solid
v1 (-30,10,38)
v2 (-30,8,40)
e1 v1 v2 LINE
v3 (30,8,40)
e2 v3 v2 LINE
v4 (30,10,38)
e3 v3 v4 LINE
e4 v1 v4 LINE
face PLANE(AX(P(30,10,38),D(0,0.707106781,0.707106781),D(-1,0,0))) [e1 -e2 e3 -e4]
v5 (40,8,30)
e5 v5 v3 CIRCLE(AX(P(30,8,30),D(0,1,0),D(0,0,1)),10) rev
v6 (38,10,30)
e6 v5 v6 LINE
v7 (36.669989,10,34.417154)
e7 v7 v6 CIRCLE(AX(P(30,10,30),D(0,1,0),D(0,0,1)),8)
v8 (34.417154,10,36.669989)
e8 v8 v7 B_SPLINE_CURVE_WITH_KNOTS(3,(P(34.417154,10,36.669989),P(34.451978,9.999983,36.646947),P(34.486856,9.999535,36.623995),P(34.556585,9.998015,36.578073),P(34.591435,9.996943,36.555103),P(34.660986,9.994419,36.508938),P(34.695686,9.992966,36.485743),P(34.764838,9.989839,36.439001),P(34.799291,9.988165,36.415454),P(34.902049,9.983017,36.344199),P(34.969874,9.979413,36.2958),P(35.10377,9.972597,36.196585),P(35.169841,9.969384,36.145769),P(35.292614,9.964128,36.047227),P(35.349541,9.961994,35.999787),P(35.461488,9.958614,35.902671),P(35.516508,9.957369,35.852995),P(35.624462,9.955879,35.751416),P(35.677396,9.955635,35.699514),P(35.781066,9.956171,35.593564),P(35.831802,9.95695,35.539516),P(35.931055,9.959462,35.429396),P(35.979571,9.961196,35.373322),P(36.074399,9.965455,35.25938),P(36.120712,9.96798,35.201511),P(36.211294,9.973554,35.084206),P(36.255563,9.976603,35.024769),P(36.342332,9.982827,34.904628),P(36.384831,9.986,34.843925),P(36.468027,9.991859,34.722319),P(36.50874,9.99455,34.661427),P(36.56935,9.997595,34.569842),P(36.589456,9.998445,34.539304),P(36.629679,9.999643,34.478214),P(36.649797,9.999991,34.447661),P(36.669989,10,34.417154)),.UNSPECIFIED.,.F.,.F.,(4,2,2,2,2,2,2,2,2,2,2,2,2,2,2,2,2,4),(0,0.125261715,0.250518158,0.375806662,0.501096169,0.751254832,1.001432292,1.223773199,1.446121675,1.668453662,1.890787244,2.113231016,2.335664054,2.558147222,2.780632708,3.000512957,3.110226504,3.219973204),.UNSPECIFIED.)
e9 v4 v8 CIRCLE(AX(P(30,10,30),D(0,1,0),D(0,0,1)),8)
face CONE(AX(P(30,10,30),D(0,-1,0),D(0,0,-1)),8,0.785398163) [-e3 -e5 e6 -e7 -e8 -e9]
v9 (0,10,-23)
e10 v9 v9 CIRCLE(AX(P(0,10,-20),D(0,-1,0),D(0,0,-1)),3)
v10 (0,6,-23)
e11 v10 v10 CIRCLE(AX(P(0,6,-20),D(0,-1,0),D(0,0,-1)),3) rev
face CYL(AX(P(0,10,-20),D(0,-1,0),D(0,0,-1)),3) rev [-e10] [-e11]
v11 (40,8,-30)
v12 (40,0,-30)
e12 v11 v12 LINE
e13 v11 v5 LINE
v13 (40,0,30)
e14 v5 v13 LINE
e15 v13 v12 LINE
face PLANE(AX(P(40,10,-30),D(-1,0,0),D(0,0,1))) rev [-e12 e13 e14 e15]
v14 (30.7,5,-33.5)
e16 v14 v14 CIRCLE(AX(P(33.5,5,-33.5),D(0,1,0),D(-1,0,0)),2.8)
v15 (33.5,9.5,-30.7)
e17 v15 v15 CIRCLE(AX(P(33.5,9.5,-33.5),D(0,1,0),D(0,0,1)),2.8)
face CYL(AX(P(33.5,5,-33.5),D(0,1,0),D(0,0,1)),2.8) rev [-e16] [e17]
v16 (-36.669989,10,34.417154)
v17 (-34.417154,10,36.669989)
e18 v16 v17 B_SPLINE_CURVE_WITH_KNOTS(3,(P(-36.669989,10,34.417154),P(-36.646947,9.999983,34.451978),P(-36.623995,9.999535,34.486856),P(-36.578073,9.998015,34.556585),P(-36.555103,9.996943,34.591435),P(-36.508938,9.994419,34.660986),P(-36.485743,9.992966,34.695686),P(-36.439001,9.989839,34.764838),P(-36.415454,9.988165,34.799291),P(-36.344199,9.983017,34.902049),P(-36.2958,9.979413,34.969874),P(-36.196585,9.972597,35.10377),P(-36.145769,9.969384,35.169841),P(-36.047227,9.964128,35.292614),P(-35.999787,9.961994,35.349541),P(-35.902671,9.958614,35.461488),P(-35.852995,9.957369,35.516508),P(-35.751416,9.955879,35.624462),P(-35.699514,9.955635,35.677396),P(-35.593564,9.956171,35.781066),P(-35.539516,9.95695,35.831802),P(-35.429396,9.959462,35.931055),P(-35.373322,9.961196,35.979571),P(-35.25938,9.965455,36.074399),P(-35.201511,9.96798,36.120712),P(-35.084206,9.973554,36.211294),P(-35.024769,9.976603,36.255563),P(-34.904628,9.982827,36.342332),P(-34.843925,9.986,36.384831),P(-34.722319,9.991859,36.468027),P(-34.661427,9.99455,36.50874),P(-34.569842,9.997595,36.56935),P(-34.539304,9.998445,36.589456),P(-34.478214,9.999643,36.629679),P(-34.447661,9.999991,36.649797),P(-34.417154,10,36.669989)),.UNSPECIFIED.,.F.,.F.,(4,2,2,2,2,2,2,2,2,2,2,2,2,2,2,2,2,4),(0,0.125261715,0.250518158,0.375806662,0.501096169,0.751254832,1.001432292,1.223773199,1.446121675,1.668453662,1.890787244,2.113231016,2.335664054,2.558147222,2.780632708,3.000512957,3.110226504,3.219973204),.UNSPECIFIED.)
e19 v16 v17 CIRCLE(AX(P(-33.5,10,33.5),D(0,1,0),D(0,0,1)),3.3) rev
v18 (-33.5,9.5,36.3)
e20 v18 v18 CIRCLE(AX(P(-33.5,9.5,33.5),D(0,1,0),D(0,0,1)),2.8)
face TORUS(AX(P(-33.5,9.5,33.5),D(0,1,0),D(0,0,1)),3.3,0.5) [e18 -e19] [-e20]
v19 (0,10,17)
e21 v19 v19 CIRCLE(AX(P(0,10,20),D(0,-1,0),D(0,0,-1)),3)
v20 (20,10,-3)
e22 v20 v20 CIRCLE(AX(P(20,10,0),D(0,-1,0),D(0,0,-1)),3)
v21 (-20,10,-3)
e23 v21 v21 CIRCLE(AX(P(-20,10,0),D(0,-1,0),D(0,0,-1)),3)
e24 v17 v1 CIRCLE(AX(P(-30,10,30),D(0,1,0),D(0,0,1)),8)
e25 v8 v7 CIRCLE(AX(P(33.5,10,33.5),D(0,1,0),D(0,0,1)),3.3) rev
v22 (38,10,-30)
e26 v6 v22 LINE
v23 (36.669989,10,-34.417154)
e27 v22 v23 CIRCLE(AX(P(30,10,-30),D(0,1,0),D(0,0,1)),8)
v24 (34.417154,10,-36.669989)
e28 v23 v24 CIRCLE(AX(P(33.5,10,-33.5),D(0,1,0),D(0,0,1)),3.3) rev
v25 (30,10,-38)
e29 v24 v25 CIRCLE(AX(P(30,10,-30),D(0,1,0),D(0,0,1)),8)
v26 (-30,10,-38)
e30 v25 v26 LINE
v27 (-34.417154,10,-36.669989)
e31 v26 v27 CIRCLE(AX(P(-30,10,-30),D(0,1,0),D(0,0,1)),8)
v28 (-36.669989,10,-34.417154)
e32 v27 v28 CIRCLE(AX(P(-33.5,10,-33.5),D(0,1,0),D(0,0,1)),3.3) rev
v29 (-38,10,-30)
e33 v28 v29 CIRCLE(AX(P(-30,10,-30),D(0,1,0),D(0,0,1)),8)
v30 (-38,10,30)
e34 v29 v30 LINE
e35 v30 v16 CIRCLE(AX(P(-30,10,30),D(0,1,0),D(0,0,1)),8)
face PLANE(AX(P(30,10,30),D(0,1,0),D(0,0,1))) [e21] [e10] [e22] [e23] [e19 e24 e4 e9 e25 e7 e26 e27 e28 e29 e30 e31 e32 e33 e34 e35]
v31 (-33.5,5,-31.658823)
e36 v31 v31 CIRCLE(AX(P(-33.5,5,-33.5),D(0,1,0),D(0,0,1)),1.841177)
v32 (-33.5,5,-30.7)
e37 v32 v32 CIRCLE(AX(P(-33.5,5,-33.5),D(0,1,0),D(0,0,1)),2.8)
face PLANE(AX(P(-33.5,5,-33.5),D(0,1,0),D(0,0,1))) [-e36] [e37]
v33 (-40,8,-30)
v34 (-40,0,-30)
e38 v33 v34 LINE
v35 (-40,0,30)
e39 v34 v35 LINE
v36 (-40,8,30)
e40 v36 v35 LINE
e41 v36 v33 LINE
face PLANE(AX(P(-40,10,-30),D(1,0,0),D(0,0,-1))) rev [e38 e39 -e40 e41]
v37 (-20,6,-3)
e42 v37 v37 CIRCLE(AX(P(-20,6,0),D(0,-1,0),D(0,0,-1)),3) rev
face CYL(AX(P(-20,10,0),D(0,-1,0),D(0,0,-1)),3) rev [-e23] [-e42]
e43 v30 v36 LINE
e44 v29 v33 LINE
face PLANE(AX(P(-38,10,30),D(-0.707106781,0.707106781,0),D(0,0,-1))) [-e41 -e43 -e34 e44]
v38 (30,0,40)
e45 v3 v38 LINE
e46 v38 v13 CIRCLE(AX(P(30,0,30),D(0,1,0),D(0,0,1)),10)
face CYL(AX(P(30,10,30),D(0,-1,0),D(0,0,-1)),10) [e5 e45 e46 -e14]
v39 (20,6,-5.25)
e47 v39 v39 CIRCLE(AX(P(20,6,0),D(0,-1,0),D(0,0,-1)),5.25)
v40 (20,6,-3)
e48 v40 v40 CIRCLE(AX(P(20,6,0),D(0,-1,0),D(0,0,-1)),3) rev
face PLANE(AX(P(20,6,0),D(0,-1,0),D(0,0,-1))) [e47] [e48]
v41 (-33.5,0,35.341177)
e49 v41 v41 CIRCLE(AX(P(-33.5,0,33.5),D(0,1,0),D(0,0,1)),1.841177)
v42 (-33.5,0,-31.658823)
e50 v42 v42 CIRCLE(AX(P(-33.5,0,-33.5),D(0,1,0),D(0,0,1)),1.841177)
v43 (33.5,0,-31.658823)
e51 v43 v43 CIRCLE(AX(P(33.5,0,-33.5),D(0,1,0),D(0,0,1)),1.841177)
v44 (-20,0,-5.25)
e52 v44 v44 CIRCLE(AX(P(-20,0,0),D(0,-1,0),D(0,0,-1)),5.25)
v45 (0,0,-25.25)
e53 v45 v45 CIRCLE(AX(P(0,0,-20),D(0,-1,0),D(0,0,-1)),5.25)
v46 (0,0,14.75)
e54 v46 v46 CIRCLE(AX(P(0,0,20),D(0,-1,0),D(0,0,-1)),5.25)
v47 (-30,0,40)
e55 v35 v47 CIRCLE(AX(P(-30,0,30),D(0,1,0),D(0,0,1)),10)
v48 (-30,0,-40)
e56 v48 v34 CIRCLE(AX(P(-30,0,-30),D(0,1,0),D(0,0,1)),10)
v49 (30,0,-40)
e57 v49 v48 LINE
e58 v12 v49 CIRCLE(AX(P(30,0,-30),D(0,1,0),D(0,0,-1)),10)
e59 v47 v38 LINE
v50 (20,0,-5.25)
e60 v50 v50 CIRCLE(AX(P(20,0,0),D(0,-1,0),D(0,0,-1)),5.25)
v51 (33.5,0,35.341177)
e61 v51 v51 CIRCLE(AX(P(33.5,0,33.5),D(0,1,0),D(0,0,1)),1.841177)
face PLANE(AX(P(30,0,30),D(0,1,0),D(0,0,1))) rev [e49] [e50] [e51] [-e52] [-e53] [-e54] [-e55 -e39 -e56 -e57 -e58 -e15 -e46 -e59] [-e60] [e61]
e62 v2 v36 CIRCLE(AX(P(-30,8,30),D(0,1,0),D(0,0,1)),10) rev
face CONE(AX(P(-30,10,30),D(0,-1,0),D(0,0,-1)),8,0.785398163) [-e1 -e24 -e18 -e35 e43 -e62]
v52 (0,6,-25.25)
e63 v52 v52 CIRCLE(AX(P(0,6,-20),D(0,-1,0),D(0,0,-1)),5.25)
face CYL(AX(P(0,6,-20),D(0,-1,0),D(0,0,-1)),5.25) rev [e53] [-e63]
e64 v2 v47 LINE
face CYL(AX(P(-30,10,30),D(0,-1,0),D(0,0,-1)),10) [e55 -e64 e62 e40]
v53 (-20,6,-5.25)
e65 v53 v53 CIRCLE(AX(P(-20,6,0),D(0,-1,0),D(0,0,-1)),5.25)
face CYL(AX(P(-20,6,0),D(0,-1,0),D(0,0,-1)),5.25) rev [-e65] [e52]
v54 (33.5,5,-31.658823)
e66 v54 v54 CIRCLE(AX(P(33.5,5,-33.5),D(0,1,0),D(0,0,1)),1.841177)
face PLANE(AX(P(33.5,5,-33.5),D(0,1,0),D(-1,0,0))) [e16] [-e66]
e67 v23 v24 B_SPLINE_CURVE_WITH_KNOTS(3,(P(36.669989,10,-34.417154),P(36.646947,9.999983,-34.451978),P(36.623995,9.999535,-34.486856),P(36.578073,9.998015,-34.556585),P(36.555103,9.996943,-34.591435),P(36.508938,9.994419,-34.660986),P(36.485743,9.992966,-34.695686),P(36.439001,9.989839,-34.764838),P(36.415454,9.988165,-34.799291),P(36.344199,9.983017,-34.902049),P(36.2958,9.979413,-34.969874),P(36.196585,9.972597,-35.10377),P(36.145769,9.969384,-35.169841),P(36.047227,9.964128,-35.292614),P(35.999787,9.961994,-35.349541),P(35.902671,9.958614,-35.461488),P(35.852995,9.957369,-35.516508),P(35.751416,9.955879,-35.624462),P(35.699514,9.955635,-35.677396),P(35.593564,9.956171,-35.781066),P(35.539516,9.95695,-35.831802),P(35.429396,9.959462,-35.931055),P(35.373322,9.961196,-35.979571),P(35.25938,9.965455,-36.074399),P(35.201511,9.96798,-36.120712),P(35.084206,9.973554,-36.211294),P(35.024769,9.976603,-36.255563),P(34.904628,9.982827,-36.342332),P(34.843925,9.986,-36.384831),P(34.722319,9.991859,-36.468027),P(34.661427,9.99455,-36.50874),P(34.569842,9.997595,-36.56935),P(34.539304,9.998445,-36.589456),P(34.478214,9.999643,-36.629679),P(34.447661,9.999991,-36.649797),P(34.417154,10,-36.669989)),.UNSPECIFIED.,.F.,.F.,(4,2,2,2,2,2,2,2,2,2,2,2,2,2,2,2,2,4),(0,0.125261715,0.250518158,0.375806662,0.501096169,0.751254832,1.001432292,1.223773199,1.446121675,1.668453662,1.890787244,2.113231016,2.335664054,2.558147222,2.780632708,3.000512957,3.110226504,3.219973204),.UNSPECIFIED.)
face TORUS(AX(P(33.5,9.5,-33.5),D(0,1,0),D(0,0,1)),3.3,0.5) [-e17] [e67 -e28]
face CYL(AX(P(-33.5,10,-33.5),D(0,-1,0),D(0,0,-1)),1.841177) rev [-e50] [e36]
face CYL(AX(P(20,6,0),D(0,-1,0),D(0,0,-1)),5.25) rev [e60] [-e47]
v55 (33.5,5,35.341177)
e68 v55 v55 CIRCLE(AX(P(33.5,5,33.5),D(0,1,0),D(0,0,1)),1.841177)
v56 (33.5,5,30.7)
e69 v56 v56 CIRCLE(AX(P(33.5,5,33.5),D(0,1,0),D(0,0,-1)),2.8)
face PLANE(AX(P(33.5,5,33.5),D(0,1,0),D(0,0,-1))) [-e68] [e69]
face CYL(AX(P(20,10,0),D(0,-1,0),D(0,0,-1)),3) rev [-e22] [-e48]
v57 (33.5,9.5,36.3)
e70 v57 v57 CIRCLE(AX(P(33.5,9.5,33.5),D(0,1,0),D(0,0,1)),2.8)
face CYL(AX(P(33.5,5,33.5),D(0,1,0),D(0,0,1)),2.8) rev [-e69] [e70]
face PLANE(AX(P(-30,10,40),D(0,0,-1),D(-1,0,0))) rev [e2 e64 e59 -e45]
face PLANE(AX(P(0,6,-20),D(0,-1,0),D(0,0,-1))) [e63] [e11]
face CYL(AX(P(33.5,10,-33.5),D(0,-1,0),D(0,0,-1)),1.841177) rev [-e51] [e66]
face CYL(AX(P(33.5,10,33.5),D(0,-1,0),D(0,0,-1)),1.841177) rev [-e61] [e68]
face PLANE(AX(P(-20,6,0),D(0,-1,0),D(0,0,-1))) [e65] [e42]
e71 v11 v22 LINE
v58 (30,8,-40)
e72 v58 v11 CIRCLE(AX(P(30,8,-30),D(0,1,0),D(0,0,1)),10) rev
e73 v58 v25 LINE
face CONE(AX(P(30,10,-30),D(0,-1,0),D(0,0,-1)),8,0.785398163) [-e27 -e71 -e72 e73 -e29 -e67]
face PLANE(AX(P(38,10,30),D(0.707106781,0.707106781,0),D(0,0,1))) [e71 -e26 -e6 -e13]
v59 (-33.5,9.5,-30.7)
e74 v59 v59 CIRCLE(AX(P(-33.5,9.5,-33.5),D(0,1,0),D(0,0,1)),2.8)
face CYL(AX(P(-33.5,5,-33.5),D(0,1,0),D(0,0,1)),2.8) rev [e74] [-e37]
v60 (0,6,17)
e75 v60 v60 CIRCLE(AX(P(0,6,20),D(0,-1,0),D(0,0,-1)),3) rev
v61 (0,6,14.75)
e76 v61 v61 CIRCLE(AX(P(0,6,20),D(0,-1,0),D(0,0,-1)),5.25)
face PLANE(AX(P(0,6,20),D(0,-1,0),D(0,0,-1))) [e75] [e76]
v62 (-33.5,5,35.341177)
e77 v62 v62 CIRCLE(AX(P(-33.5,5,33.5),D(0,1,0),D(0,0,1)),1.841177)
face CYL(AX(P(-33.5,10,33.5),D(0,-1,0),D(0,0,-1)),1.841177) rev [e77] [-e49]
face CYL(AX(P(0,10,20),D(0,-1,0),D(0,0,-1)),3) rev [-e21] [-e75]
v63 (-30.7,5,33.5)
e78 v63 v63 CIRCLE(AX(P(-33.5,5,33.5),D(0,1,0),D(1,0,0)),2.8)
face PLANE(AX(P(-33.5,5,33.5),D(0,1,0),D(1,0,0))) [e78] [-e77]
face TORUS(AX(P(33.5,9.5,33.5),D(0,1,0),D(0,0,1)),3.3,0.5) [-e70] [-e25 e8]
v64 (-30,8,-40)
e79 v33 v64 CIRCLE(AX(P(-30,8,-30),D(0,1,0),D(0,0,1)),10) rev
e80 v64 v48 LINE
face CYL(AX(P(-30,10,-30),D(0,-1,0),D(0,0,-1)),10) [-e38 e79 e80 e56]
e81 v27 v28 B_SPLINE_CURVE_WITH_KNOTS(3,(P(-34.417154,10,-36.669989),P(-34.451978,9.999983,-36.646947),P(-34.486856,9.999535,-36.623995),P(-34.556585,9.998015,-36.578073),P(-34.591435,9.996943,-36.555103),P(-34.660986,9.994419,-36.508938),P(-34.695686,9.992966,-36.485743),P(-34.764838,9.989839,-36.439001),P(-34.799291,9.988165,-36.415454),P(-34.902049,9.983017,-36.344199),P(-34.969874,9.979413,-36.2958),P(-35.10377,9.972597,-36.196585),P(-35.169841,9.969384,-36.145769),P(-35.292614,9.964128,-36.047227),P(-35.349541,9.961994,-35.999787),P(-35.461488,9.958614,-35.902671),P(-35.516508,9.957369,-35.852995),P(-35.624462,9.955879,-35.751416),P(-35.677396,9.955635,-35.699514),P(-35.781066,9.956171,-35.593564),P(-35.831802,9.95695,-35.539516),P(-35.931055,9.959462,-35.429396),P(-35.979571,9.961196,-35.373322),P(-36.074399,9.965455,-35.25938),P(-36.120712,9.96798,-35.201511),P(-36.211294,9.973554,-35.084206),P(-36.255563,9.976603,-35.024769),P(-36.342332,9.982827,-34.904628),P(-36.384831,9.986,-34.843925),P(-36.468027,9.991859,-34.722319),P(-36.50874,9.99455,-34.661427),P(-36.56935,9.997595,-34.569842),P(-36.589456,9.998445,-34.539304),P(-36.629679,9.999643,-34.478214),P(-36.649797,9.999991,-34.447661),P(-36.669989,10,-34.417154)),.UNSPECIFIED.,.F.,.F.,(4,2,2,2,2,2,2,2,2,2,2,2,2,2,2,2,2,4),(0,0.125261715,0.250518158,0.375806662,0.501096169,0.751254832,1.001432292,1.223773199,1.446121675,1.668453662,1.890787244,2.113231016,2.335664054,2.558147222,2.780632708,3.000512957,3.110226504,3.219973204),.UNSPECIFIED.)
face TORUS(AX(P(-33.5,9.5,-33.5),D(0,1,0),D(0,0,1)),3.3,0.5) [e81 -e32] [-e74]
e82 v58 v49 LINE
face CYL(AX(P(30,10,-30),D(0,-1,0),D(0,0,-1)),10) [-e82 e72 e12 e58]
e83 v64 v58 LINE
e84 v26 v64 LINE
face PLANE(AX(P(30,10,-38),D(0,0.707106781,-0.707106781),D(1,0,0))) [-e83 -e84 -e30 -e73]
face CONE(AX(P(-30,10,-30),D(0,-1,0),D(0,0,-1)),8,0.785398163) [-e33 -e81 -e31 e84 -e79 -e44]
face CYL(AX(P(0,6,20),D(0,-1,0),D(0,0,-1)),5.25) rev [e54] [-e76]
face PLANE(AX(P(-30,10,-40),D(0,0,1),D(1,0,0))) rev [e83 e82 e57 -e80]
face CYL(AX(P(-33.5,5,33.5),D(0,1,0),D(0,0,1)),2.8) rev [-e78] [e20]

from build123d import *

# Parameters (mm, degrees)
SKETCH1_R                = 1.841177256
BOSS_EXTRUDE1_DEPTH      = 10
SKETCH2_R                = 2.8
CUT_EXTRUDE1_DEPTH       = 5
FILLET1_R                = 0.5
CIRPATTERN1_COUNT        = 4
FILLET1_OF_CIRPATTERN1_R = 0.5
SKETCH4_R                = 3
CUT_EXTRUDE2_DEPTH       = 10
SKETCH5_R                = 5.25
CUT_EXTRUDE3_DEPTH       = 6
CHAMFER1_SIZE            = 2


with BuildPart() as part:
    # Sketch1 → Boss-Extrude1 (new body)
    with BuildSketch(Plane(origin=(0, 0, 0), x_dir=(1, 0, 0), z_dir=(0, 1, 0))):
        with BuildLine():
            Line((-30, 40), (30, 40))
            ThreePointArc((30, 40), (37.071067812, 37.071067812), (40, 30))
            Line((40, 30), (40, -30))
            ThreePointArc((40, -30), (37.071067812, -37.071067812), (30, -40))
            Line((30, -40), (-30, -40))
            ThreePointArc((-30, -40), (-37.071067812, -37.071067812), (-40, -30))
            Line((-40, -30), (-40, 30))
            ThreePointArc((-40, 30), (-37.071067812, 37.071067812), (-30, 40))
        make_face()
        with Locations(Location((-33.5, 33.5, 0), (0, 0, 270))):
            Circle(SKETCH1_R, mode=Mode.SUBTRACT)
        with Locations(Location((33.5, 33.5, 0), (0, 0, 270))):
            Circle(SKETCH1_R, mode=Mode.SUBTRACT)
        with Locations(Location((33.5, -33.5, 0), (0, 0, 270))):
            Circle(SKETCH1_R, mode=Mode.SUBTRACT)
        with Locations(Location((-33.5, -33.5, 0), (0, 0, 270))):
            Circle(SKETCH1_R, mode=Mode.SUBTRACT)
    extrude(amount=BOSS_EXTRUDE1_DEPTH)

    # Sketch2 → Cut-Extrude1 (cut)
    with BuildSketch(Plane(origin=(0, 10, 0), x_dir=(1, 0, 0), z_dir=(0, 1, 0))):
        with Locations(Location((-33.5, 33.5, 0), (0, 0, 270))):
            Circle(SKETCH2_R)
    cut_extrude1 = extrude(amount=-CUT_EXTRUDE1_DEPTH, mode=Mode.SUBTRACT)

    # Fillet1
    fillet1_edges = [part.edges().sort_by_distance(p)[0] for p in [
        (-33.5, 10, -36.3),
    ]]
    fillet(fillet1_edges, radius=FILLET1_R)

    # CirPattern1: Cut-Extrude1 ×4 about axis
    cirpattern1_axis = Axis((0, 0, 0), (0, 1, 0))
    for i in range(1, CIRPATTERN1_COUNT):
        add(cut_extrude1.rotate(cirpattern1_axis, i * 360 / CIRPATTERN1_COUNT), mode=Mode.SUBTRACT)

    # Fillet1 of CirPattern1
    fillet1_of_cirpattern1_edges = [part.edges().sort_by_distance(p)[0] for p in [
        (-36.3, 10, 33.5),
        (33.5, 10, 36.3),
        (36.3, 10, -33.5),
    ]]
    fillet(fillet1_of_cirpattern1_edges, radius=FILLET1_OF_CIRPATTERN1_R)

    # Sketch4 → Cut-Extrude2 (cut)
    with BuildSketch(Plane.XZ):
        with Locations(Location((20, 0, 0), (0, 0, 270))):
            Circle(SKETCH4_R)
        with Locations(Location((0, -20, 0), (0, 0, 270))):
            Circle(SKETCH4_R)
        with Locations(Location((-20, 0, 0), (0, 0, 270))):
            Circle(SKETCH4_R)
        with Locations(Location((0, 20, 0), (0, 0, 270))):
            Circle(SKETCH4_R)
    extrude(amount=-CUT_EXTRUDE2_DEPTH, mode=Mode.SUBTRACT)

    # Sketch5 → Cut-Extrude3 (cut)
    with BuildSketch(Plane.XZ):
        with Locations(Location((20, 0, 0), (0, 0, 270))):
            Circle(SKETCH5_R)
        with Locations(Location((0, -20, 0), (0, 0, 270))):
            Circle(SKETCH5_R)
        with Locations(Location((-20, 0, 0), (0, 0, 270))):
            Circle(SKETCH5_R)
        with Locations(Location((0, 20, 0), (0, 0, 270))):
            Circle(SKETCH5_R)
    extrude(amount=-CUT_EXTRUDE3_DEPTH, mode=Mode.SUBTRACT)

    # Chamfer1
    # the kernel refuses this chamfer: 2 mm, written as the material it takes off along each edge
    with BuildSketch(Plane(origin=(30, 10, -30), x_dir=(0, 0, -1), z_dir=(-1, 0, 0))) as chamfer1_piece_1:
        Polygon((10 - CHAMFER1_SIZE, 0), (10, CHAMFER1_SIZE), (10, 0), align=None)
    revolve(axis=Axis((30, 10, -30), (0, -1, 0)), revolution_arc=90, mode=Mode.SUBTRACT)
    with BuildSketch(Plane(origin=(-30, 10, -40), x_dir=(0, 0.02749587661058651, 0.9996219169112968), z_dir=(1, 0, 0)), Plane(origin=(-40, 10, 30), x_dir=(0.9996219169112968, 0.02749587661058651, 0), z_dir=(0, 0, -1)), Plane(origin=(30, 10, 40), x_dir=(0, 0.02749587661058651, -0.9996219169112968), z_dir=(-1, 0, 0)), Plane(origin=(40, 10, -30), x_dir=(-0.9996219169112968, 0.02749587661058651, 0), z_dir=(0, 0, 1))) as chamfer1_piece_2:
        Polygon((CHAMFER1_SIZE * 0.999621916911, CHAMFER1_SIZE * 0.0274958766106), (-CHAMFER1_SIZE * 0.0274958766106, CHAMFER1_SIZE * 0.999621916911), (0, 0), align=None)
    extrude(amount=60, mode=Mode.SUBTRACT)
    with BuildSketch(Plane(origin=(-30, 10, -30), x_dir=(-1, 0, 0), z_dir=(0, 0, 1))) as chamfer1_piece_3:
        Polygon((10 - CHAMFER1_SIZE, 0), (10, CHAMFER1_SIZE), (10, 0), align=None)
    revolve(axis=Axis((-30, 10, -30), (0, -1, 0)), revolution_arc=90, mode=Mode.SUBTRACT)
    with BuildSketch(Plane(origin=(-30, 10, 30), x_dir=(0, 0, 1), z_dir=(1, 0, 0))) as chamfer1_piece_4:
        Polygon((10 - CHAMFER1_SIZE, 0), (10, CHAMFER1_SIZE), (10, 0), align=None)
    revolve(axis=Axis((-30, 10, 30), (0, -1, 0)), revolution_arc=90, mode=Mode.SUBTRACT)
    with BuildSketch(Plane(origin=(30, 10, 30), x_dir=(1, 0, 0), z_dir=(0, 0, -1))) as chamfer1_piece_5:
        Polygon((10 - CHAMFER1_SIZE, 0), (10, CHAMFER1_SIZE), (10, 0), align=None)
    revolve(axis=Axis((30, 10, 30), (0, -1, 0)), revolution_arc=90, mode=Mode.SUBTRACT)


solid = part.part
